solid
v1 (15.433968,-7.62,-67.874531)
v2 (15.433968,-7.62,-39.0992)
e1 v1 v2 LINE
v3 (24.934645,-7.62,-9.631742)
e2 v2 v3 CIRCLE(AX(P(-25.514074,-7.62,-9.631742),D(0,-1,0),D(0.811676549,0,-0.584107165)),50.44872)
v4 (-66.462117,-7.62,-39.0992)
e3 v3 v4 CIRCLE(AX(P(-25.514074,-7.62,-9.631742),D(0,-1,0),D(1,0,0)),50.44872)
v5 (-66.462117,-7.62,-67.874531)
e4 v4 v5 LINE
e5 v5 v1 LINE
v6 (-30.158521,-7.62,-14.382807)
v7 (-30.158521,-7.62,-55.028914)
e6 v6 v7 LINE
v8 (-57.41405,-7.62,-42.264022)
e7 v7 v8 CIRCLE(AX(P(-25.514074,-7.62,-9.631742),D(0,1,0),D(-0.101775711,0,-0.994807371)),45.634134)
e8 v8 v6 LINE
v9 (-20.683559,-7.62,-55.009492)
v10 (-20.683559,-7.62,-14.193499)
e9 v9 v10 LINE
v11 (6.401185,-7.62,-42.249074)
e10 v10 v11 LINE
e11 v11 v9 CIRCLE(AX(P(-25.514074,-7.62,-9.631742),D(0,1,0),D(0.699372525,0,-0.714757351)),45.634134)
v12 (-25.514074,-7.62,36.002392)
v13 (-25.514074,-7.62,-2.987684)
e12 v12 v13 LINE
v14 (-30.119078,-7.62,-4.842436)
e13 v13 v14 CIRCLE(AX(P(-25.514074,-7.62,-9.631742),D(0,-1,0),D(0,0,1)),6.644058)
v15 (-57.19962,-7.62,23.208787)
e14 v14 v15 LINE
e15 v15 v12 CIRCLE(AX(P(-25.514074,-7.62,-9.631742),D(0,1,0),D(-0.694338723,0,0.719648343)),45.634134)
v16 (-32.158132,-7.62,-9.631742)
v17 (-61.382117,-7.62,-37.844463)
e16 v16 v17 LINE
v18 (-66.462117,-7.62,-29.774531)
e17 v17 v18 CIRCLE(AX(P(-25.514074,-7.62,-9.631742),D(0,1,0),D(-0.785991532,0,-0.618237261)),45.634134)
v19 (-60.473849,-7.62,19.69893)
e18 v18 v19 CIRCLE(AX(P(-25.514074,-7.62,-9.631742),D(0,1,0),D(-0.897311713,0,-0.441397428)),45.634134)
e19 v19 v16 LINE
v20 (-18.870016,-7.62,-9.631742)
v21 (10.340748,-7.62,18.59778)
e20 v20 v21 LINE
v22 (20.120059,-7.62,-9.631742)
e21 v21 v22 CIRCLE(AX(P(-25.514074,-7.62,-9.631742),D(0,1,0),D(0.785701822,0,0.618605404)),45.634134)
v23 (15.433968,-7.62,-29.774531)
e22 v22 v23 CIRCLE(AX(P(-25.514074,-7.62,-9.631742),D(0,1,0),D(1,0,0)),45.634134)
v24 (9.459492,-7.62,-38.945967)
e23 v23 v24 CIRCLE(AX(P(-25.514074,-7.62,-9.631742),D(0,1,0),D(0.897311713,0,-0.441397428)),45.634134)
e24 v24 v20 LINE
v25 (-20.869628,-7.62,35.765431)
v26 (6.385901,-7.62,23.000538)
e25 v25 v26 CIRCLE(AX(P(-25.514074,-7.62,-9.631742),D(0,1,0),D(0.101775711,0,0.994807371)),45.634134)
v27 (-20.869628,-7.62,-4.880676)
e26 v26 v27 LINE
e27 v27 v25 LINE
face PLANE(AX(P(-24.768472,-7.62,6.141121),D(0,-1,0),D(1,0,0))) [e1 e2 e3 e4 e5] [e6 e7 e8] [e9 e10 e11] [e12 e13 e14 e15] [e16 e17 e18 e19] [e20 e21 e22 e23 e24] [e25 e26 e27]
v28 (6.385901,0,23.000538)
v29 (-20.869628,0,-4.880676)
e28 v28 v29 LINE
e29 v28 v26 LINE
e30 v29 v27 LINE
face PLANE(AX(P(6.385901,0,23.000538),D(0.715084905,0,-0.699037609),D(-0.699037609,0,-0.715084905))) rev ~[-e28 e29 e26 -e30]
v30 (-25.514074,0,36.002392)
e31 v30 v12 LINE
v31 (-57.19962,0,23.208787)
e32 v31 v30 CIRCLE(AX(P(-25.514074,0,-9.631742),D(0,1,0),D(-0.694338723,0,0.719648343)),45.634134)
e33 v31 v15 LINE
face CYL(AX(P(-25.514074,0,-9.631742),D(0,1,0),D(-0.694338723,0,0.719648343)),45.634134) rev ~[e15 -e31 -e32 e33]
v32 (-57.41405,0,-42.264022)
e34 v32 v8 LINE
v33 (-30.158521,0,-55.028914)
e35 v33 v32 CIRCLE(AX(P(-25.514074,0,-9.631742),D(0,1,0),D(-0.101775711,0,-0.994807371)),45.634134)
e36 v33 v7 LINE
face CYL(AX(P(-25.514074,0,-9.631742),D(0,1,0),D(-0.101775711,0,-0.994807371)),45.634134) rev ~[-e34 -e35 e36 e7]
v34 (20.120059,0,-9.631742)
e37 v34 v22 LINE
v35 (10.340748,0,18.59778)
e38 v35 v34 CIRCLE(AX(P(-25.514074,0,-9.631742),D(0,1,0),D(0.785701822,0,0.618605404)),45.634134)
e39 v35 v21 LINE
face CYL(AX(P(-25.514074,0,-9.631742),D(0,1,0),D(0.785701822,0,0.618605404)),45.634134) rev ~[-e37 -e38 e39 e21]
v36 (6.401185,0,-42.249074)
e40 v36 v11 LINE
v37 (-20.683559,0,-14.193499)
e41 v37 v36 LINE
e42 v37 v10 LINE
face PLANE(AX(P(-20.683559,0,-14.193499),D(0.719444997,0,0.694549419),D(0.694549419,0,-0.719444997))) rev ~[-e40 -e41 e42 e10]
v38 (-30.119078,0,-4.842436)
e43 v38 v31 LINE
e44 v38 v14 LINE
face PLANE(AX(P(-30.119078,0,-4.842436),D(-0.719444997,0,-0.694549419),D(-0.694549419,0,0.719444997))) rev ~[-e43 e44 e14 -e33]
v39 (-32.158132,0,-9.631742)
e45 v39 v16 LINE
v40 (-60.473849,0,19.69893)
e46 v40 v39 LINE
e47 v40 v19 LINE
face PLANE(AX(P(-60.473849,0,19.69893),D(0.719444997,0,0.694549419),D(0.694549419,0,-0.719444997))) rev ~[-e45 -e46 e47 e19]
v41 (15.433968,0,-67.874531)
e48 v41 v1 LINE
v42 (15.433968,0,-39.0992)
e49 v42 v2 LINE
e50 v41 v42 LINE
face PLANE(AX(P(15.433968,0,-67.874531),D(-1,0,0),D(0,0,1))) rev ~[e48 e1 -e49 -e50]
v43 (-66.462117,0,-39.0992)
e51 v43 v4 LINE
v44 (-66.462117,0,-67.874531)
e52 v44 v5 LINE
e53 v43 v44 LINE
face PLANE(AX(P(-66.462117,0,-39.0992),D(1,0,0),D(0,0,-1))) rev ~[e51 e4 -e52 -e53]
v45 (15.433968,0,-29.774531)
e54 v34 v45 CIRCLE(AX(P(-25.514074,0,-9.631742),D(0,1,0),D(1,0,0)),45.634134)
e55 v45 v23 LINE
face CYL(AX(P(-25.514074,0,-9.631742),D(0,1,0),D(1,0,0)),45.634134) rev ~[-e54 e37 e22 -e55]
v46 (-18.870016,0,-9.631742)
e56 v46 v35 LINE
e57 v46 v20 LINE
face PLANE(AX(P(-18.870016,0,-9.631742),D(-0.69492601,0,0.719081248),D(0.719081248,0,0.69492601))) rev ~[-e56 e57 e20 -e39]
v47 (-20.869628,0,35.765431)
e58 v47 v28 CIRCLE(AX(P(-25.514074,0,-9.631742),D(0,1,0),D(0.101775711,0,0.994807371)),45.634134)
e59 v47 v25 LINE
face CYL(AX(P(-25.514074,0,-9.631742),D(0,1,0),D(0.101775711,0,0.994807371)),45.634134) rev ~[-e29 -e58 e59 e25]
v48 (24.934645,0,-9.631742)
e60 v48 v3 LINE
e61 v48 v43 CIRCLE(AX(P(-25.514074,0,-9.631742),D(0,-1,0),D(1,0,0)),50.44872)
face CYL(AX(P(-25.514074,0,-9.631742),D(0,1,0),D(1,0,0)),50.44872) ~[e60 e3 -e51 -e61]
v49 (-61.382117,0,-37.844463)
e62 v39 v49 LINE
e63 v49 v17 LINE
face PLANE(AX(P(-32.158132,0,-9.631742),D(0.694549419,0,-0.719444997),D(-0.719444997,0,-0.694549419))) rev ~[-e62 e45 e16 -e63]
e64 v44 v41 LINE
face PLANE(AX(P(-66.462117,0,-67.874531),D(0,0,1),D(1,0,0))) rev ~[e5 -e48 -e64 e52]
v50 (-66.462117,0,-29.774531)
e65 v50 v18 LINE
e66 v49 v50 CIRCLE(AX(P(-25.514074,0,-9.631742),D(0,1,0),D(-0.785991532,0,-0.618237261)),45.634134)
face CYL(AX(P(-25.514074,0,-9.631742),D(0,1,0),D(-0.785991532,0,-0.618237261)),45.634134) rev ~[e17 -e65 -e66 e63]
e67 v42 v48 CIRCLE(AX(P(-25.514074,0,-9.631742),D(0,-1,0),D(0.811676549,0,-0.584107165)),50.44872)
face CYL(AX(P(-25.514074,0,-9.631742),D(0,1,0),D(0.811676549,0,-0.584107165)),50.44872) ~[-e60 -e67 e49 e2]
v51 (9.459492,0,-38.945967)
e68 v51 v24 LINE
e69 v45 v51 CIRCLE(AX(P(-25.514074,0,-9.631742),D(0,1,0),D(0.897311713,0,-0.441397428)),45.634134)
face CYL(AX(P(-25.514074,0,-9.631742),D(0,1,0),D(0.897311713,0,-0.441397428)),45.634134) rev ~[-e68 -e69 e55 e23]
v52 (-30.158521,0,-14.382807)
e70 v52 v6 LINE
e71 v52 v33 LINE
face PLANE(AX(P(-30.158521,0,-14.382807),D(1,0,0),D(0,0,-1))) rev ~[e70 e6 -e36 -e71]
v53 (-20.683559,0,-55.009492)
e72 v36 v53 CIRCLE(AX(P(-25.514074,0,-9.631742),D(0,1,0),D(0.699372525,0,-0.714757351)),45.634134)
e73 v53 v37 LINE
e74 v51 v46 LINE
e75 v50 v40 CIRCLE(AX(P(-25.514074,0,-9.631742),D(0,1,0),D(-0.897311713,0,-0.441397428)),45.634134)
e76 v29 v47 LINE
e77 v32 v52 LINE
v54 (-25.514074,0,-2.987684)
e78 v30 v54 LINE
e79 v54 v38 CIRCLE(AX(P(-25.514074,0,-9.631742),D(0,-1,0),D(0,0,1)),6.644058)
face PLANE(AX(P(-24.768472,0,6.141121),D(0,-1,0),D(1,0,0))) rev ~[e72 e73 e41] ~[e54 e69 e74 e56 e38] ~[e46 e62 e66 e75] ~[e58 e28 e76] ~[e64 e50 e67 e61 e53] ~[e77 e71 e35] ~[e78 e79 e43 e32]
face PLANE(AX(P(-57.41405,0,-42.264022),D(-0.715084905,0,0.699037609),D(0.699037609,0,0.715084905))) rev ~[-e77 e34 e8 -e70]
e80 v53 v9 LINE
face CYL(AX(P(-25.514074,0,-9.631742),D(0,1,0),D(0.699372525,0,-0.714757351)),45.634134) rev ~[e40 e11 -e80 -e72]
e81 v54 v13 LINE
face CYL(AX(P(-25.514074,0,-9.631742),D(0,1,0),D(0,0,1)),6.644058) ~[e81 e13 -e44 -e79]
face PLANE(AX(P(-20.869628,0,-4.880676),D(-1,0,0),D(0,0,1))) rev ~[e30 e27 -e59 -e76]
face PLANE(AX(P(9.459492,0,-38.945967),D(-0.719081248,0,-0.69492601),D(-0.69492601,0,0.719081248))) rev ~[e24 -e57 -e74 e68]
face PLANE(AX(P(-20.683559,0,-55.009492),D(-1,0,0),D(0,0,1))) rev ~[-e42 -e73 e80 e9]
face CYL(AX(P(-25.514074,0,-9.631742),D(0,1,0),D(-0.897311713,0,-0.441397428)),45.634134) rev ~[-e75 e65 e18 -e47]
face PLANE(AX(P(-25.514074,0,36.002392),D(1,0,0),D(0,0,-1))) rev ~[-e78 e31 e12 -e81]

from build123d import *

# Parameters (mm, degrees)
F1_DEPTH = 7.62


# Not quite as in the source:
# - a feature names something its author has since deleted; it is built from what else it names


with BuildPart() as f1:
    # F0 (on Front) → F1 (new body)
    with BuildSketch(Plane.XZ):
        with BuildLine():
            ThreePointArc((10.3407477596, 18.5977799931), (17.6059784875, 5.3059692522), (20.1200594207, -9.6317416622))
            ThreePointArc((20.1200594207, -9.6317416622), (18.9331000604, -19.9720923089), (15.4339684141, -29.7745308699))
            Line((15.4339684141, -29.7745308699), (15.4339684141, -39.0992002321))
            ThreePointArc((15.4339684141, -39.0992002321), (22.5007653243, -25.1123260967), (24.9346453986, -9.6317416622))
            ThreePointArc((24.9346453986, -9.6317416622), (-40.9946586007, 38.3830978282), (-66.4621167465, -39.0992002321))
            Line((-66.4621167465, -39.0992002321), (-66.4621167465, -29.7745308699))
            ThreePointArc((-66.4621167465, -29.7745308699), (-70.8175510234, -4.1482087801), (-60.473849015, 19.6989298396))
            ThreePointArc((-60.473849015, 19.6989298396), (-58.8829140283, 21.49693763), (-57.1996202187, 23.2087869508))
            ThreePointArc((-57.1996202187, 23.2087869508), (-42.5995223376, 32.6832865075), (-25.5140741662, 36.0023919246))
            ThreePointArc((-25.5140741662, 36.0023919246), (-23.1888304756, 35.9431131373), (-20.869627773, 35.7654307819))
            ThreePointArc((-20.869627773, 35.7654307819), (-6.1592475305, 31.6945796612), (6.3859014459, 23.0005384324))
            ThreePointArc((6.3859014459, 23.0005384324), (8.4347729102, 20.8633387673), (10.3407477596, 18.5977799931))
        make_face()
        with BuildLine():
            Line((15.4339684141, -39.0992002321), (15.4339684141, -29.7745308699))
            ThreePointArc((15.4339684141, -29.7745308699), (12.7227075108, -34.5400269346), (9.459491795, -38.9459674269))
            ThreePointArc((9.459491795, -38.9459674269), (7.971092144, -40.635254131), (6.4011850797, -42.2490741021))
            ThreePointArc((6.4011850797, -42.2490741021), (-6.064908215, -50.9137485421), (-20.6835588609, -55.0094924892))
            ThreePointArc((-20.6835588609, -55.0094924892), (-25.4205342826, -55.265779381), (-30.1585205594, -55.0289141064))
            ThreePointArc((-30.1585205594, -55.0289141064), (-44.8689008019, -50.9580629857), (-57.4140497783, -42.2640217569))
            ThreePointArc((-57.4140497783, -42.2640217569), (-59.4700632753, -40.1188693041), (-61.3821167465, -37.8444634324))
            ThreePointArc((-61.3821167465, -37.8444634324), (-64.1334823406, -33.9425512021), (-66.4621167465, -29.7745308699))
            Line((-66.4621167465, -29.7745308699), (-66.4621167465, -39.0992002321))
            ThreePointArc((-66.4621167465, -39.0992002321), (-25.5140741662, -60.0804612271), (15.4339684141, -39.0992002321))
        make_face()
        with BuildLine():
            Line((15.4339684141, -55.2114608665), (15.4339684141, -39.0992002321))
            ThreePointArc((15.4339684141, -39.0992002321), (-25.5140741662, -60.0804612271), (-66.4621167465, -39.0992002321))
            Line((-66.4621167465, -39.0992002321), (-66.4621167465, -58.9845308699))
            Line((-66.4621167465, -58.9845308699), (-66.4621167465, -67.8745308699))
            Line((-66.4621167465, -67.8745308699), (15.4339684141, -67.8745308699))
            Line((15.4339684141, -67.8745308699), (15.4339684141, -58.9845308699))
            Line((15.4339684141, -58.9845308699), (15.4339684141, -55.2114608665))
        make_face()
        with BuildLine():
            Line((-30.119077868, -4.8424361606), (-57.1996202187, 23.2087869508))
            ThreePointArc((-57.1996202187, 23.2087869508), (-58.8829140283, 21.49693763), (-60.473849015, 19.6989298396))
            Line((-60.473849015, 19.6989298396), (-32.1581321342, -9.6317416622))
            ThreePointArc((-32.1581321342, -9.6317416622), (-31.6271510436, -7.0290896739), (-30.119077868, -4.8424361606))
        make_face()
        with BuildLine():
            Line((-57.4140497783, -42.2640217569), (-30.1585205594, -14.3828072251))
            ThreePointArc((-30.1585205594, -14.3828072251), (-31.6378588353, -12.2090983718), (-32.1581321342, -9.6317416622))
            Line((-32.1581321342, -9.6317416622), (-61.3821167465, -37.8444634324))
            ThreePointArc((-61.3821167465, -37.8444634324), (-59.4700632753, -40.1188693041), (-57.4140497783, -42.2640217569))
        make_face()
        with BuildLine():
            Line((-20.6835588609, -55.0094924892), (-20.6835588609, -14.1934987981))
            ThreePointArc((-20.6835588609, -14.1934987981), (-25.3813532931, -16.2744738901), (-30.1585205594, -14.3828072251))
            Line((-30.1585205594, -14.3828072251), (-30.1585205594, -55.0289141064))
            ThreePointArc((-30.1585205594, -55.0289141064), (-25.4205342826, -55.265779381), (-20.6835588609, -55.0094924892))
        make_face()
        with BuildLine():
            Line((-18.8700161982, -9.6317416622), (10.3407477596, 18.5977799931))
            ThreePointArc((10.3407477596, 18.5977799931), (8.4347729102, 20.8633387673), (6.3859014459, 23.0005384324))
            Line((6.3859014459, 23.0005384324), (-20.869627773, -4.8806760994))
            ThreePointArc((-20.869627773, -4.8806760994), (-19.3902894971, -7.0543849527), (-18.8700161982, -9.6317416622))
        make_face()
        with BuildLine():
            Line((-20.869627773, -4.8806760994), (-20.869627773, 35.7654307819))
            ThreePointArc((-20.869627773, 35.7654307819), (-23.1888304756, 35.9431131373), (-25.5140741662, 36.0023919246))
            Line((-25.5140741662, 36.0023919246), (-25.5140741662, -2.9876836943))
            ThreePointArc((-25.5140741662, -2.9876836943), (-23.006370907, -3.4791055894), (-20.869627773, -4.8806760994))
        make_face()
        with BuildLine():
            ThreePointArc((-20.6835588609, -14.1934987981), (-19.340026467, -12.0862561334), (-18.8700161982, -9.6317416622))
            ThreePointArc((-18.8700161982, -9.6317416622), (-19.3902894971, -7.0543849527), (-20.869627773, -4.8806760994))
            ThreePointArc((-20.869627773, -4.8806760994), (-23.006370907, -3.4791055894), (-25.5140741662, -2.9876836943))
            ThreePointArc((-25.5140741662, -2.9876836943), (-27.9963194101, -3.4687906783), (-30.119077868, -4.8424361606))
            ThreePointArc((-30.119077868, -4.8424361606), (-31.6271510436, -7.0290896739), (-32.1581321342, -9.6317416622))
            ThreePointArc((-32.1581321342, -9.6317416622), (-31.6378588353, -12.2090983718), (-30.1585205594, -14.3828072251))
            ThreePointArc((-30.1585205594, -14.3828072251), (-25.3813532931, -16.2744738901), (-20.6835588609, -14.1934987981))
        make_face()
        with BuildLine():
            Line((9.459491795, -38.9459674269), (-18.8700161982, -9.6317416622))
            ThreePointArc((-18.8700161982, -9.6317416622), (-19.340026467, -12.0862561334), (-20.6835588609, -14.1934987981))
            Line((-20.6835588609, -14.1934987981), (6.4011850797, -42.2490741021))
            ThreePointArc((6.4011850797, -42.2490741021), (7.971092144, -40.635254131), (9.459491795, -38.9459674269))
        make_face()
    extrude(amount=F1_DEPTH)


solid = f1.part
